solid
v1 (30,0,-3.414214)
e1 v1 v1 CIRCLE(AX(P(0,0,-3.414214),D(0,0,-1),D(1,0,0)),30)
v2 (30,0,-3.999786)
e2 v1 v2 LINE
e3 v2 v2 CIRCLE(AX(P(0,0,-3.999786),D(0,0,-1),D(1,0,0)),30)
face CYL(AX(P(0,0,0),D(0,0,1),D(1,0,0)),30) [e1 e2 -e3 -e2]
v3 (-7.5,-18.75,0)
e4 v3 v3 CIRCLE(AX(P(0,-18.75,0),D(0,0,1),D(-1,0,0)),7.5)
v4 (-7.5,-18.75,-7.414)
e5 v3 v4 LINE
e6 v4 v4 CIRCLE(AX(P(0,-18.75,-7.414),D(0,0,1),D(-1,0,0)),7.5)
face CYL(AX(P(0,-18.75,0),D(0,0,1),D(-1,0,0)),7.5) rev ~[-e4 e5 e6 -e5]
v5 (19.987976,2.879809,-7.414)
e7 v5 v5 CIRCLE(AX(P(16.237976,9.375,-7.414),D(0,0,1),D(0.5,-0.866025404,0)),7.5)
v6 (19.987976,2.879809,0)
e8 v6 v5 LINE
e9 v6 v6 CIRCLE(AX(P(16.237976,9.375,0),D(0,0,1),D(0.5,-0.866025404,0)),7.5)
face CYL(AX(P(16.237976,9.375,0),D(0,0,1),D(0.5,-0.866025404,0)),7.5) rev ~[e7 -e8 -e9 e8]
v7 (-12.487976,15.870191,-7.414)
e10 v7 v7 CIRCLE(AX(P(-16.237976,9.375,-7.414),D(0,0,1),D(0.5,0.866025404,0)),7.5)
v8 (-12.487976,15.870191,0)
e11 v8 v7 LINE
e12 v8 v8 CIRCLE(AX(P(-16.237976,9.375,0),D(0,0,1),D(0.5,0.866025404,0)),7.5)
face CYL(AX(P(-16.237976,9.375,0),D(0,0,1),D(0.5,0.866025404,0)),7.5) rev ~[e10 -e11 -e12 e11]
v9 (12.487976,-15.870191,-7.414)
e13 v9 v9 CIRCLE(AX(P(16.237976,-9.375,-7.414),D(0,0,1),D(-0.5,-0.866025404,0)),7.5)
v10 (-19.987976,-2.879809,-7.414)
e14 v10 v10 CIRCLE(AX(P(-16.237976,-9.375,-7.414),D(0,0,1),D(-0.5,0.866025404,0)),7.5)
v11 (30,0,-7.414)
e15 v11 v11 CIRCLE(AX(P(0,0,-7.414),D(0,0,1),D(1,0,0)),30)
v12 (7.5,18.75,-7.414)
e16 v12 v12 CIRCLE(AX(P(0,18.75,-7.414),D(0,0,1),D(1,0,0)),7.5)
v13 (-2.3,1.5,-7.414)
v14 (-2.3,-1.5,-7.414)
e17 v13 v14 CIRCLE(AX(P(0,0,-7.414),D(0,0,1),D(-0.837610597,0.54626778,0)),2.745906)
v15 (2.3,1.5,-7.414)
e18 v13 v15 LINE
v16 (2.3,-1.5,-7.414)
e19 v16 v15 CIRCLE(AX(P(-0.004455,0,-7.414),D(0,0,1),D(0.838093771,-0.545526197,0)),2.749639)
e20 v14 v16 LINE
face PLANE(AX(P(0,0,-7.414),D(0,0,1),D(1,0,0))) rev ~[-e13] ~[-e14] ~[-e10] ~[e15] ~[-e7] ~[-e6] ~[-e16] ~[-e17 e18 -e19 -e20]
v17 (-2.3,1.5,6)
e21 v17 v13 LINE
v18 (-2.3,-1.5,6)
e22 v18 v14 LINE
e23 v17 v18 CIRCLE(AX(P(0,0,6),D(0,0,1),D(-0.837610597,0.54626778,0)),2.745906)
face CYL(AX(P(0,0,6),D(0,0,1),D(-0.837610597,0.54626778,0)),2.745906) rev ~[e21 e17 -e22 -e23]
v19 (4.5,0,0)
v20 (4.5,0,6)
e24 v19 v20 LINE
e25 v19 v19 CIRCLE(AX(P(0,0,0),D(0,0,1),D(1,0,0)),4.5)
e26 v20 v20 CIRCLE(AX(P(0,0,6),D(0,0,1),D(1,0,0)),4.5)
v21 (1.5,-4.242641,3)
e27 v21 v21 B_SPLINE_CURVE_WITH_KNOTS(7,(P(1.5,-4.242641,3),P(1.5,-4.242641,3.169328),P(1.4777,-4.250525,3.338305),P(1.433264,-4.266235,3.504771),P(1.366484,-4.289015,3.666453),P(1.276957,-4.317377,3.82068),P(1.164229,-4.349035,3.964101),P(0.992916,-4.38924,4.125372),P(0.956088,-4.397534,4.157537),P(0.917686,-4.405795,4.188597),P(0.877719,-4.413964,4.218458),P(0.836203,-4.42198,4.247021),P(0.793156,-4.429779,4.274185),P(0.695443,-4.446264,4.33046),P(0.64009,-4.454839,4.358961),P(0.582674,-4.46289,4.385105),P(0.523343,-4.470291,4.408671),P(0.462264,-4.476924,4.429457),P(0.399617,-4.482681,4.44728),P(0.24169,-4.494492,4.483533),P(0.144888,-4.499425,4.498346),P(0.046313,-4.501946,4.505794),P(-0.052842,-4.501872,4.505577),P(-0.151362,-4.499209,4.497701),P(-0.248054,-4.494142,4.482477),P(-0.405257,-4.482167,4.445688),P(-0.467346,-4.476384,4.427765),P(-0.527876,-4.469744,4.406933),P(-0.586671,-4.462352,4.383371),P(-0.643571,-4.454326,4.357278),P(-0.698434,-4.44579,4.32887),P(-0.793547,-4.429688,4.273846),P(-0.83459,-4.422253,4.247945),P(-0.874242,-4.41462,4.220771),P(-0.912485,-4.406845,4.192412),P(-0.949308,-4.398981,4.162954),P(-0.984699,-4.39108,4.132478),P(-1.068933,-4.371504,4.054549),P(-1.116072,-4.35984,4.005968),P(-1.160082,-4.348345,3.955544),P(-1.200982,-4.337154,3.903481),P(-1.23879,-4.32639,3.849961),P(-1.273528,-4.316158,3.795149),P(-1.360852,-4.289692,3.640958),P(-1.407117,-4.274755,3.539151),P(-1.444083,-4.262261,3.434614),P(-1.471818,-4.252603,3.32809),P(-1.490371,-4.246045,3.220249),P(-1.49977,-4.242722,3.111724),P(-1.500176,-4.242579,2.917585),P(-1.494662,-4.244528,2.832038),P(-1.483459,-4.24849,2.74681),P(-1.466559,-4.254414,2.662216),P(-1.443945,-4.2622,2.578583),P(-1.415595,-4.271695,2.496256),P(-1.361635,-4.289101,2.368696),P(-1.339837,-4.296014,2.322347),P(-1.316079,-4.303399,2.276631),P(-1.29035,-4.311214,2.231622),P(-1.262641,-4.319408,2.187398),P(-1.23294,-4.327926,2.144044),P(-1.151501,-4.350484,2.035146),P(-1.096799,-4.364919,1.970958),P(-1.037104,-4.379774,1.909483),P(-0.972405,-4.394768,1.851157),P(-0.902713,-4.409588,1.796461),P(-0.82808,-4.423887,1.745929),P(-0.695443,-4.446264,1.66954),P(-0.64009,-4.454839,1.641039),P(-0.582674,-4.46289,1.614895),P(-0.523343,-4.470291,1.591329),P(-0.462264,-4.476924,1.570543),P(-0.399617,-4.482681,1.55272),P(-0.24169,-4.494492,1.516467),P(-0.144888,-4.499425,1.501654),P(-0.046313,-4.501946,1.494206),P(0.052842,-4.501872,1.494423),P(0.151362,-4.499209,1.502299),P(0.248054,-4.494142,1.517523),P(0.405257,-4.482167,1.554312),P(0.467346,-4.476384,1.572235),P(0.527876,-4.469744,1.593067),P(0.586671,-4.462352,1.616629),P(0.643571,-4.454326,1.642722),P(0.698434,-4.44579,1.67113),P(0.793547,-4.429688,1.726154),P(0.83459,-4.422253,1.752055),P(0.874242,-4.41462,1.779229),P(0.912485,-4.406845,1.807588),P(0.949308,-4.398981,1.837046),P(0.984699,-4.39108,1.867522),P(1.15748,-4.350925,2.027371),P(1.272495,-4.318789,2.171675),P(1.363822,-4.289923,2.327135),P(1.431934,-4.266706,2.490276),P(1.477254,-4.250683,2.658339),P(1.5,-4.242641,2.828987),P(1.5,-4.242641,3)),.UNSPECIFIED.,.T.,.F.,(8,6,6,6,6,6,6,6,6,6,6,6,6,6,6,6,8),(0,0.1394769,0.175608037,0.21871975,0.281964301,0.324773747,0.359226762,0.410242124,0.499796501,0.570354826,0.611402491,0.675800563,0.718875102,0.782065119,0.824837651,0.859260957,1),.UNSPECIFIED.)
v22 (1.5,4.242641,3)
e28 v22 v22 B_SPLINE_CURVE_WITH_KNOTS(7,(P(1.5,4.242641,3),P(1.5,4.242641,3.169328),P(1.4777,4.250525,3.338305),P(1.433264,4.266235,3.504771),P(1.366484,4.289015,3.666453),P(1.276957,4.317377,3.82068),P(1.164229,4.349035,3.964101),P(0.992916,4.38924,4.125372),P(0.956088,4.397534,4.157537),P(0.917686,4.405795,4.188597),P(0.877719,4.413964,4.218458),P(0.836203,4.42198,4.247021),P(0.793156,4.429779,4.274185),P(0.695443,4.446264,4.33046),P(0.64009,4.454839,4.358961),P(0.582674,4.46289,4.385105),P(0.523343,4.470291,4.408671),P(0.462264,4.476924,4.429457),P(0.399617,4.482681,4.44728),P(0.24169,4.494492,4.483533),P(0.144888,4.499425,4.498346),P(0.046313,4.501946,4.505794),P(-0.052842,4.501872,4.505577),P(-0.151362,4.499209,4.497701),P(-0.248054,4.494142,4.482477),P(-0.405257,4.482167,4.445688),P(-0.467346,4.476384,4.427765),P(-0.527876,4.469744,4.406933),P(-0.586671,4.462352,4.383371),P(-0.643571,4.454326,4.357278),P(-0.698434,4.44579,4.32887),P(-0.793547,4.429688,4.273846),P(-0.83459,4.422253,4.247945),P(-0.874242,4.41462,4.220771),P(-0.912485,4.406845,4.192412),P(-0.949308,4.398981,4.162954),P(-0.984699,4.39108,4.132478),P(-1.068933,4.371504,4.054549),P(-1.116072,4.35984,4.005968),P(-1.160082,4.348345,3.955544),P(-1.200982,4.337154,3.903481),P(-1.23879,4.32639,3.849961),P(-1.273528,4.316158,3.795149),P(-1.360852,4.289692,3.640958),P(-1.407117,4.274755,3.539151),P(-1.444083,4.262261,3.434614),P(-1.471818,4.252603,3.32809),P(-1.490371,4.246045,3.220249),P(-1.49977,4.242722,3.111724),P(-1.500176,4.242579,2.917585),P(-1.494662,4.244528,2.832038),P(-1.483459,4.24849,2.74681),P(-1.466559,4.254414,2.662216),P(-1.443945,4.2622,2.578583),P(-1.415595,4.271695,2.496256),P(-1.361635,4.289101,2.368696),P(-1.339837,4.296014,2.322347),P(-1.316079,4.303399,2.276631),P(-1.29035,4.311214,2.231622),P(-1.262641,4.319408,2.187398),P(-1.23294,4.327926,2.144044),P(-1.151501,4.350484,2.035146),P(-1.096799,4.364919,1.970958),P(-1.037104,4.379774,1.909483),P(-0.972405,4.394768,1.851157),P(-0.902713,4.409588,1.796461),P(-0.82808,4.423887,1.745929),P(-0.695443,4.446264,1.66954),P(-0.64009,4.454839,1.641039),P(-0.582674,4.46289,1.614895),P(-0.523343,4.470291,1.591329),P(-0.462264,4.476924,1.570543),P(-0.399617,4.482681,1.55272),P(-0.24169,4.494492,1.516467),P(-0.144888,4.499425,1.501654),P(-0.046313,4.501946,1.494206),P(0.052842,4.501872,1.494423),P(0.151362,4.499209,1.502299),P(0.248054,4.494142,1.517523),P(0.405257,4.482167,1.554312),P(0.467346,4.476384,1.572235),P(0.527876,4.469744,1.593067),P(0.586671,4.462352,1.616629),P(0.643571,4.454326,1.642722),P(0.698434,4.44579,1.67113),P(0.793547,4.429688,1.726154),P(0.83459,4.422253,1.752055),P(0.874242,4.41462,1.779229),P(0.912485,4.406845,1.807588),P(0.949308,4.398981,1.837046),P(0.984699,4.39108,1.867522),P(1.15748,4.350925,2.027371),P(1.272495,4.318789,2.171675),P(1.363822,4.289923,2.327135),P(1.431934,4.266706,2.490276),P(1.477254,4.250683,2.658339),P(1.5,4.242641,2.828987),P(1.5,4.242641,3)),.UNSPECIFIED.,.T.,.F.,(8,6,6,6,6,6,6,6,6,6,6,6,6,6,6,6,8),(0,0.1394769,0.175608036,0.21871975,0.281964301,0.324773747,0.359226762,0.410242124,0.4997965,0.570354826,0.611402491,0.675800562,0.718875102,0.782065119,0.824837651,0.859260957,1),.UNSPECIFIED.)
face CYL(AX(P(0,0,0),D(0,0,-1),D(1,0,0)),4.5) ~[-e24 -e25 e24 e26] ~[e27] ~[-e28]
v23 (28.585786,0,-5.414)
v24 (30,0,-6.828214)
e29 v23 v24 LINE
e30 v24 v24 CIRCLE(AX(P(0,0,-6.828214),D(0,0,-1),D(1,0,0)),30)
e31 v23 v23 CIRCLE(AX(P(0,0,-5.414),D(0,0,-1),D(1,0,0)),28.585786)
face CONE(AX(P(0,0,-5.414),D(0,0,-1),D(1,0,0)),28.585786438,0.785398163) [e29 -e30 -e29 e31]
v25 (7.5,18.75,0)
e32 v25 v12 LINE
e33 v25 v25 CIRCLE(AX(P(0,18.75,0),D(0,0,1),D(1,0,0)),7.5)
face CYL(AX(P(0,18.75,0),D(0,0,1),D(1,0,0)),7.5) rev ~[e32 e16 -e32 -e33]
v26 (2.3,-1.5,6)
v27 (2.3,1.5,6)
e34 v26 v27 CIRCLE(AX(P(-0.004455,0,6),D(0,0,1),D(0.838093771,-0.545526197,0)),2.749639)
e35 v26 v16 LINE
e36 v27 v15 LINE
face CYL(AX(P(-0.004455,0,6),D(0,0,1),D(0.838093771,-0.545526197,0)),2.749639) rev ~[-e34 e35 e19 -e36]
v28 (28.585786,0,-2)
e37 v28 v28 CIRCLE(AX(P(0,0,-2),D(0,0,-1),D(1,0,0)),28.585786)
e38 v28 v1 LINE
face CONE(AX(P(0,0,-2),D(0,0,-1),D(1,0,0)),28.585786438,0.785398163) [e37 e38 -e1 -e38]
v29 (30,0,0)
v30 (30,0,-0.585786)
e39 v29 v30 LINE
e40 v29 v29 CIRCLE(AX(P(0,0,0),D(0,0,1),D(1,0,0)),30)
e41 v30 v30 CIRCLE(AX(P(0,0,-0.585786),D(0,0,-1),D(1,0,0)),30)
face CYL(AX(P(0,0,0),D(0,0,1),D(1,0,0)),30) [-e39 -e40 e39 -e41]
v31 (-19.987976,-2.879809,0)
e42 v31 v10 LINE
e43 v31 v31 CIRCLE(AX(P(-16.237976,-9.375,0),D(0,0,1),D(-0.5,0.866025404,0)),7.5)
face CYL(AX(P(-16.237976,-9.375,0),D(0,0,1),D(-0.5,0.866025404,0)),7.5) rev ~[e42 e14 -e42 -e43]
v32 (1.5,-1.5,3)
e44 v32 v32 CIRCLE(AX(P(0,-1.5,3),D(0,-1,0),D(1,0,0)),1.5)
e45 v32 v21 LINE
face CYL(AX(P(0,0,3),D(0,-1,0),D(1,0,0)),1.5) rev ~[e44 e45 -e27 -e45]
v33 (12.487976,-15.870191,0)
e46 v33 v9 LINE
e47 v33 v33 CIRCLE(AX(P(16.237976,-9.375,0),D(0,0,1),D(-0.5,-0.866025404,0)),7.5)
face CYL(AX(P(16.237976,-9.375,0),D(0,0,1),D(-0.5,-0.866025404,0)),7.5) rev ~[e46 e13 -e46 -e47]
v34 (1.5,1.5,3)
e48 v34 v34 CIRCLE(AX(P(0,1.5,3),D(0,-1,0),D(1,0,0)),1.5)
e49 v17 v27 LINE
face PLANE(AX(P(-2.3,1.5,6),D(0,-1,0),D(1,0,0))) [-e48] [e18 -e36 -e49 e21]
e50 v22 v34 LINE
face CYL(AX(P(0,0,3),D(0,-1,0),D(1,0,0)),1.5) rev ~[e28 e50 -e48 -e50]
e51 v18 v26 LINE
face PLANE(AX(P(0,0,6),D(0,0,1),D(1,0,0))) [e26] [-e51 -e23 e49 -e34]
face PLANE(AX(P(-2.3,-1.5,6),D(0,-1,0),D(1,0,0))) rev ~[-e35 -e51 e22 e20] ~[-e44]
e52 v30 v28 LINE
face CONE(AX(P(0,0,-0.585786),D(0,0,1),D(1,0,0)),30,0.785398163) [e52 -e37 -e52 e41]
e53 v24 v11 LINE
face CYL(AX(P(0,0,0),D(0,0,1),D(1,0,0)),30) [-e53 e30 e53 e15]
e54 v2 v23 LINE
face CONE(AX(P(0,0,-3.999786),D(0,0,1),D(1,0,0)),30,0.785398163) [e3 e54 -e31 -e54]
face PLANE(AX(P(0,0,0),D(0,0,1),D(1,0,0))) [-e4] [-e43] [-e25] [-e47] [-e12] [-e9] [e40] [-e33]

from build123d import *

# Parameters (mm, degrees)
F0_R             = 30
F0_R_2           = 4.5
F1_DEPTH         = 7.414
F2_DEPTH         = 6
F3_R             = 1.5
F4_DEPTH         = 12.5
F5_W             = 4.6
F5_H             = 3
F6_DEPTH         = 13.414
F9_R             = 7.5
F10_DEPTH        = 25
F10_COPIES_COUNT = 6


# Not quite as in the source:
# - a pattern or mirror of a feature is missing from the dataset's text; its kind, count and spacing are read off the source's solid


with BuildPart() as f1:
    # F0 (on Top) → F1 (new body)
    with BuildSketch(Plane.XY):
        Circle(F0_R)
        Circle(F0_R_2, mode=Mode.SUBTRACT)
        Circle(F0_R_2)
    extrude(amount=-F1_DEPTH)

    # F0 (on Top) → F2 (join)
    with BuildSketch(Plane.XY):
        Circle(F0_R_2)
    extrude(amount=F2_DEPTH)

    # F3 (on Front) → F4 (cut, symmetric)
    with BuildSketch(Plane.XZ):
        with Locations((0, 3)):
            Circle(F3_R)
    extrude(amount=F4_DEPTH, both=True, mode=Mode.SUBTRACT)

    # F5 (on face) → F6 (cut, through all)
    with BuildSketch(Plane.XY.offset(6)):
        Rectangle(F5_W, F5_H)
        with BuildLine():
            ThreePointArc((-2.3, 1.5), (-2.7459060435, 0), (-2.3, -1.5))
            Line((-2.3, -1.5), (-2.3, 1.5))
        make_face()
        with BuildLine():
            Line((2.3, 1.5), (2.3, -1.5))
            ThreePointArc((2.3, -1.5), (2.745183651, 0), (2.3, 1.5))
        make_face()
    extrude(amount=-F6_DEPTH, mode=Mode.SUBTRACT)

    # F7 (on Front) → F8 (revolve, cut)
    with BuildSketch(Plane.XZ):
        Polygon((30, -3.4142135624), (30, -0.5857864376), (28.5857864376, -2), align=None)
        Polygon((30, -6.8282135624), (30, -3.9997864376), (28.5857864376, -5.414), align=None)
    revolve(axis=Axis((0, 0, 0.7614716887), (0, 0, -1)), mode=Mode.SUBTRACT)

    # F9 (on face) → F10 (cut)
    with BuildSketch(Plane.XY):
        with Locations((0, 18.75)):
            Circle(F9_R)
    f10 = extrude(amount=-F10_DEPTH, mode=Mode.SUBTRACT)

    # F10_copies: F10 ×6 about axis
    f10_copies_axis = Axis((0, 0, 0), (0, 0, 1))
    for i in range(1, F10_COPIES_COUNT):
        add(f10.rotate(f10_copies_axis, i * 360 / F10_COPIES_COUNT), mode=Mode.SUBTRACT)


solid = f1.part
